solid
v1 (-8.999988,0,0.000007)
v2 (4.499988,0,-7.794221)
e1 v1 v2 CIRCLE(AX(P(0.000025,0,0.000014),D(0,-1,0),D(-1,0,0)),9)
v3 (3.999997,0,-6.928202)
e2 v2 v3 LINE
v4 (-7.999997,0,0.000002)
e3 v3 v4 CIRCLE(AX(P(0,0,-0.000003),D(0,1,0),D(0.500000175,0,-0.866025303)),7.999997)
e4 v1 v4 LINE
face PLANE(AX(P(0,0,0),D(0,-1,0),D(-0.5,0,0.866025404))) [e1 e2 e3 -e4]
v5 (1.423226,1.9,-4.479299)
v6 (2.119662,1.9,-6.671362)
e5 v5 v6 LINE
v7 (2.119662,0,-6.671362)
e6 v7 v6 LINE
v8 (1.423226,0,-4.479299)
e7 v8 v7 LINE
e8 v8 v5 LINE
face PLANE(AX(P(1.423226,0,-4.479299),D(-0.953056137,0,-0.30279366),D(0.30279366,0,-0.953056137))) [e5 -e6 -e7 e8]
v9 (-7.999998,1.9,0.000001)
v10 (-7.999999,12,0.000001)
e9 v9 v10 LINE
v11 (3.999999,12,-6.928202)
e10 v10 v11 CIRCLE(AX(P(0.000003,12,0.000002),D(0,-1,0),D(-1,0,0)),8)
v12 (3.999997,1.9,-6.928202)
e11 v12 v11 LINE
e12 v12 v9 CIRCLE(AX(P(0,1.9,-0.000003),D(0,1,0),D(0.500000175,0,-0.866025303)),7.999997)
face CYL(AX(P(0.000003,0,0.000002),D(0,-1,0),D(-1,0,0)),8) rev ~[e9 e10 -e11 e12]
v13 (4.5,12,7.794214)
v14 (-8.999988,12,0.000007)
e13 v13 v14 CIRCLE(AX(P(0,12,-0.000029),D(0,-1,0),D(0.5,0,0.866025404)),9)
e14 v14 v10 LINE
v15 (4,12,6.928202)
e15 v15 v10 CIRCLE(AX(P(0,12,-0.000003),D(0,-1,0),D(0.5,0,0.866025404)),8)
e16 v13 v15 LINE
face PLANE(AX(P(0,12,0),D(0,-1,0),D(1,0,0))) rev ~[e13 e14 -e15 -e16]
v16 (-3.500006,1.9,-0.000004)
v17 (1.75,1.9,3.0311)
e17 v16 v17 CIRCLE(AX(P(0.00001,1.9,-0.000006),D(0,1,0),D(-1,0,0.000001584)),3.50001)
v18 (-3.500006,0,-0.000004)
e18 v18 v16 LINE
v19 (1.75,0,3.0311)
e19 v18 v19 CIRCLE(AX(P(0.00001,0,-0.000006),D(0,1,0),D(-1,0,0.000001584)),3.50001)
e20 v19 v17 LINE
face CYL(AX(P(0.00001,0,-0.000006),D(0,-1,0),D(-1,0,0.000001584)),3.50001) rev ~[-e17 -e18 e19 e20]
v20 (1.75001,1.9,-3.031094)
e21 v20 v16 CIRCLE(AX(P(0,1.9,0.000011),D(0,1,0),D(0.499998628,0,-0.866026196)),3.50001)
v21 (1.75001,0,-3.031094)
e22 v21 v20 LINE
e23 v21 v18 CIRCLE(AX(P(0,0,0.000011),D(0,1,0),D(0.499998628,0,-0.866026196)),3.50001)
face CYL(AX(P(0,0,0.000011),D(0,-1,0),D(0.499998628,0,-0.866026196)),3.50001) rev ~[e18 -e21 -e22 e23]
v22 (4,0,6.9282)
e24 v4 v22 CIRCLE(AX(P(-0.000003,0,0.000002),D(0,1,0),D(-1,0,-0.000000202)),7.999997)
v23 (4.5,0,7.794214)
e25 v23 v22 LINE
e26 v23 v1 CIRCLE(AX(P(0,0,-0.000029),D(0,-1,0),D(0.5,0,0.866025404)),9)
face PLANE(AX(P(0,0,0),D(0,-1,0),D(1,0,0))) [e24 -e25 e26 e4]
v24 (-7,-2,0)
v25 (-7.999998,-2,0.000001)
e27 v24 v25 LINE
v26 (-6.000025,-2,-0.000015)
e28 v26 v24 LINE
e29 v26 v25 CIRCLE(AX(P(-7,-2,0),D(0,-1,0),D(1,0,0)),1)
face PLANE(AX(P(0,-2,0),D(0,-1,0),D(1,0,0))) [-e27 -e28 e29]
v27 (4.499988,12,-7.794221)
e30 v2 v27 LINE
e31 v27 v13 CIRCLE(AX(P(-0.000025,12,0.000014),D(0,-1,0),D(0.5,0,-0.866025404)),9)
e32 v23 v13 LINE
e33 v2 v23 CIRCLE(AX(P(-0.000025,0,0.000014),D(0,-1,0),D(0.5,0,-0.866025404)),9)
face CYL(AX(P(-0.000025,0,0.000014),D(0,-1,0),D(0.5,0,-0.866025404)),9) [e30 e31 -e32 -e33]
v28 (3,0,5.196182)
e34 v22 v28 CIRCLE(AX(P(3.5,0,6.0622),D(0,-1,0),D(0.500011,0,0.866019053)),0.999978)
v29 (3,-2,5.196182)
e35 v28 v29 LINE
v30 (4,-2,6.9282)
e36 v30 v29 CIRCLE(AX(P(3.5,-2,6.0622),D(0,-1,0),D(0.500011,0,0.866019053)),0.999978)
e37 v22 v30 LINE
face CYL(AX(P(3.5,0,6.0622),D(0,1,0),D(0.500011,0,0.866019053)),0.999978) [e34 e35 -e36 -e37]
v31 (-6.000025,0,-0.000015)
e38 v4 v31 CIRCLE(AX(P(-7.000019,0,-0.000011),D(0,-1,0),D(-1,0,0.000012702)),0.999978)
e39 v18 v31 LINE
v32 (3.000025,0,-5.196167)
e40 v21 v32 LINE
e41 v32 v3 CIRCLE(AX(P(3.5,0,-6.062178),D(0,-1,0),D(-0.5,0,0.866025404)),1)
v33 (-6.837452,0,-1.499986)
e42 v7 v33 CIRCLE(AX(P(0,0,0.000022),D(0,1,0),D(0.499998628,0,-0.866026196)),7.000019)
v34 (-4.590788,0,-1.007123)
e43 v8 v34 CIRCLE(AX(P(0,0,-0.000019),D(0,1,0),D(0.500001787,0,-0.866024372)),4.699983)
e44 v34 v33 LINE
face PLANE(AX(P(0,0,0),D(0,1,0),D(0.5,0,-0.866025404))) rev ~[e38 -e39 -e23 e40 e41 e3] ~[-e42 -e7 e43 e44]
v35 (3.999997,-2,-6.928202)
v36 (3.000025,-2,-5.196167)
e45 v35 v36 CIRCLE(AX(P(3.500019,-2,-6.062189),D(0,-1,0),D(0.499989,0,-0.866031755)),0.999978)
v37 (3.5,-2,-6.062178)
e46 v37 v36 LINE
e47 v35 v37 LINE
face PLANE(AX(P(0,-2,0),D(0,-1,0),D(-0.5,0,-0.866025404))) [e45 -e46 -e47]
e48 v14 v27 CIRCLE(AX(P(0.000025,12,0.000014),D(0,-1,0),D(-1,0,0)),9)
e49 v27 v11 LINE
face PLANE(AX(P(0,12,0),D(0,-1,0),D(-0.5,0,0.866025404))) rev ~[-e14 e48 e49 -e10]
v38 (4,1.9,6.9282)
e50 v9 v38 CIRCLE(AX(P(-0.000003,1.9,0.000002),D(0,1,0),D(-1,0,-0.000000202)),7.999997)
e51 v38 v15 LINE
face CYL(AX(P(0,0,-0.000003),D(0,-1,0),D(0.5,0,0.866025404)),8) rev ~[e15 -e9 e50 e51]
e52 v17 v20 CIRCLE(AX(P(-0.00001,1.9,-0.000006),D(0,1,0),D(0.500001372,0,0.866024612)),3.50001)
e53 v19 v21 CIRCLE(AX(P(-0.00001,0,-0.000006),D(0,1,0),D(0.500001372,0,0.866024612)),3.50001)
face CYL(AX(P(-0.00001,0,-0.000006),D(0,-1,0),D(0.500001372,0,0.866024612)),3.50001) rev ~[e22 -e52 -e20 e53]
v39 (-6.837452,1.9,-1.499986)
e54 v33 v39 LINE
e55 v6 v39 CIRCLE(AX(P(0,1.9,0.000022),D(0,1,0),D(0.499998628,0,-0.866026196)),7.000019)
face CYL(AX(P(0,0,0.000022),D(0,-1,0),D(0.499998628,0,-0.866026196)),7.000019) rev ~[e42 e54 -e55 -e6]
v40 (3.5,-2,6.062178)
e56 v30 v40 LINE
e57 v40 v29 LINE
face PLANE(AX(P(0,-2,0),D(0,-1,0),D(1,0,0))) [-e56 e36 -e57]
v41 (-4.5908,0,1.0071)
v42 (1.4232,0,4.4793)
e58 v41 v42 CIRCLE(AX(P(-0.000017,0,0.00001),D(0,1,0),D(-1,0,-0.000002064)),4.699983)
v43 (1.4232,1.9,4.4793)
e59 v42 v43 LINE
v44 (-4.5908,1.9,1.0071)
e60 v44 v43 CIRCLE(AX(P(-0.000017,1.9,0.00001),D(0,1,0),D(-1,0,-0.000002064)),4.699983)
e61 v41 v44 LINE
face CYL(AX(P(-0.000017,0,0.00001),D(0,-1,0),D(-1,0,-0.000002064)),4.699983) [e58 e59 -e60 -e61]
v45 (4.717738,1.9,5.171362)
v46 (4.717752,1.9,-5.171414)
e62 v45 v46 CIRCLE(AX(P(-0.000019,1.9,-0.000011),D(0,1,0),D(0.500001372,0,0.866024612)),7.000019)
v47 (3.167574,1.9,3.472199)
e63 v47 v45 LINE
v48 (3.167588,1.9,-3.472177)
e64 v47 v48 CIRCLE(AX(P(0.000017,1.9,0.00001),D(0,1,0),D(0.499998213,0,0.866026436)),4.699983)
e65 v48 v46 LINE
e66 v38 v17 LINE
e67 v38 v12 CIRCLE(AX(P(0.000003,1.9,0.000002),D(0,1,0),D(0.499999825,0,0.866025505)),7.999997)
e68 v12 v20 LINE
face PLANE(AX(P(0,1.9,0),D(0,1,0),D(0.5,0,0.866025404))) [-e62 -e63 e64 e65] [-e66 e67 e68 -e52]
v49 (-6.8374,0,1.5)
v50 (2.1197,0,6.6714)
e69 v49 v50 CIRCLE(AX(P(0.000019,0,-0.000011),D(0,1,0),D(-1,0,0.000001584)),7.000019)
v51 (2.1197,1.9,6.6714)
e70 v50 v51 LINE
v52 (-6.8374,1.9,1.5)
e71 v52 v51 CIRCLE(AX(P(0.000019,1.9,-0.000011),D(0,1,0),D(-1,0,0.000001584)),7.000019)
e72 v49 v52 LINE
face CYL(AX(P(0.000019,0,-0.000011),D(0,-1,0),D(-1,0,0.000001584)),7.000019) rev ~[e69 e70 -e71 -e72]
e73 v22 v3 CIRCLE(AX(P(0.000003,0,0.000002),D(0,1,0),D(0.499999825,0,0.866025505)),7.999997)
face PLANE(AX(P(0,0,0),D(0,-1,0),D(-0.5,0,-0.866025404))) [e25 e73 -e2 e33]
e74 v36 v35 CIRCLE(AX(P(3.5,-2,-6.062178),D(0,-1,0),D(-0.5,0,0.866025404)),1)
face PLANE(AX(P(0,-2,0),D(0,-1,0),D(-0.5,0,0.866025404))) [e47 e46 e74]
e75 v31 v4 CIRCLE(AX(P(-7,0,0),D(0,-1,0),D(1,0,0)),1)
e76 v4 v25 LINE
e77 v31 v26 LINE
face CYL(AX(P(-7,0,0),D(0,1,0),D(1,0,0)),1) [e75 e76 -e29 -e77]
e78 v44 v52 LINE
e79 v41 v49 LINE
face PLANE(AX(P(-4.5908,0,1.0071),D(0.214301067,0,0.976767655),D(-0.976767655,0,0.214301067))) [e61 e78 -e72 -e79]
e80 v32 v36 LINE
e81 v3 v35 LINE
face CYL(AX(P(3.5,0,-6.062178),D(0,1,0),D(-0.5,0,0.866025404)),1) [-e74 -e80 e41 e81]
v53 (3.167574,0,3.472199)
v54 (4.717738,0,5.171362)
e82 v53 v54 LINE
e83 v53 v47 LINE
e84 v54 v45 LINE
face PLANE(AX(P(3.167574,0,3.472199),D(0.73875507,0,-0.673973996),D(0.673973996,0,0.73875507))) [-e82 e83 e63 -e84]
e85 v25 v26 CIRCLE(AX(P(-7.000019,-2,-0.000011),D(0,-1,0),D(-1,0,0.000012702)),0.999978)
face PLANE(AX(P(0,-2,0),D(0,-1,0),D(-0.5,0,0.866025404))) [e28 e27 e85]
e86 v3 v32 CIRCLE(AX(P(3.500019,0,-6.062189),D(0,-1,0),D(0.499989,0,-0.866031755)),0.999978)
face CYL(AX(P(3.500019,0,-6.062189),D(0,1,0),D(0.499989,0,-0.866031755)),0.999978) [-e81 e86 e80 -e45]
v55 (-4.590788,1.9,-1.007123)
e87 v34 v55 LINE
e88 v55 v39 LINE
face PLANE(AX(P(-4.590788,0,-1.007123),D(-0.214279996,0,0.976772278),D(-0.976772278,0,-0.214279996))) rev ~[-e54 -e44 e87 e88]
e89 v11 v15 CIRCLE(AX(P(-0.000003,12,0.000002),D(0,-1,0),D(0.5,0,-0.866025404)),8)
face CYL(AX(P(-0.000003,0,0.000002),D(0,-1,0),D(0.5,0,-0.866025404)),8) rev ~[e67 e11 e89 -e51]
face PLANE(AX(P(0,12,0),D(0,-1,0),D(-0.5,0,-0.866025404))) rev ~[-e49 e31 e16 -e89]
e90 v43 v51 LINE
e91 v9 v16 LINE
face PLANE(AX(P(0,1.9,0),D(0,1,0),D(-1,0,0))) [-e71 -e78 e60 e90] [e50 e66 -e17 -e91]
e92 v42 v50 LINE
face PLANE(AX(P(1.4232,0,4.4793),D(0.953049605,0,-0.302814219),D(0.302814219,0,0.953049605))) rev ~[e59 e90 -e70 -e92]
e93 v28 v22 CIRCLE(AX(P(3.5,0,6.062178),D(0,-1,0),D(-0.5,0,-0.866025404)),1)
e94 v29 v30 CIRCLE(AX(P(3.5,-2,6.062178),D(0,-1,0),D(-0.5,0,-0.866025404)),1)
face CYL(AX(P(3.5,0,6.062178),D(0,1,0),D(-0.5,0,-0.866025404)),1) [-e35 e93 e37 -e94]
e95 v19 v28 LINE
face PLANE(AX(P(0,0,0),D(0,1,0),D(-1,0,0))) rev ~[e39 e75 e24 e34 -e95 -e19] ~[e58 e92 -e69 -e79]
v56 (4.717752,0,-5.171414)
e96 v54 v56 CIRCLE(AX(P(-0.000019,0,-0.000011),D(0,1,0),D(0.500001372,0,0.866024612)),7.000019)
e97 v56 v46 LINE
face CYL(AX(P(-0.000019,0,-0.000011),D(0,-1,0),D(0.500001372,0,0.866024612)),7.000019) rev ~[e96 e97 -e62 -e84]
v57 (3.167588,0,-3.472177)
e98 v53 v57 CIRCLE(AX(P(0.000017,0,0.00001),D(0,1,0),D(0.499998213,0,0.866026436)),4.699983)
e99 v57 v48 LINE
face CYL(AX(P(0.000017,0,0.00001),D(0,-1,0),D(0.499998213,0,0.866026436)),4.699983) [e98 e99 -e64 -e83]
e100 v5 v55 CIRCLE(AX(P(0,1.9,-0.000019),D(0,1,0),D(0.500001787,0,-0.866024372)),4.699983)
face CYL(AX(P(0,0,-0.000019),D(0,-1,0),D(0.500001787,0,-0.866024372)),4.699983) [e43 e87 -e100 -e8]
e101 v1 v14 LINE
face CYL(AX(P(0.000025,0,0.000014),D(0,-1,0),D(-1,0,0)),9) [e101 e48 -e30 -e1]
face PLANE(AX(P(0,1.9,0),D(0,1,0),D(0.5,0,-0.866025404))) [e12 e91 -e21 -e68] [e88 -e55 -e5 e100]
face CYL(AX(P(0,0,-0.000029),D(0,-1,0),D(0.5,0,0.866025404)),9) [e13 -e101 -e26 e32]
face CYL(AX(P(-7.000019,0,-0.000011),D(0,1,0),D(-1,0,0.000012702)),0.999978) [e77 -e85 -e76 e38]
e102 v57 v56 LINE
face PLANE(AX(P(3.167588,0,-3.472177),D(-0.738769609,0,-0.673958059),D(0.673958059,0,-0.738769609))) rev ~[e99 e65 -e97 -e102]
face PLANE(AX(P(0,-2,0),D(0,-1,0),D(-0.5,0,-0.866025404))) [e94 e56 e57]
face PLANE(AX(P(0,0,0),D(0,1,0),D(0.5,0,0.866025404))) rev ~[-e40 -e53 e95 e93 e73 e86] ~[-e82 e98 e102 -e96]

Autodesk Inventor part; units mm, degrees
ref_plane "YZ Plane" through (0, 0, 0) normal (1, 0, 0) x (0, 1, 0)
ref_plane "XZ Plane" through (0, 0, 0) normal (0, 1, 0) x (-1, 0, 0)
ref_plane "XY Plane" through (0, 0, 0) normal (0, 0, 1) x (1, 0, 0)
sketch "スケッチ6" plane through (0, 0, 0) normal (0, 1, 0) x (-1, 0, 0)
  arc A0 (9, 0) -> (-4.5, 7.7942) centre (0, 0) ccw
  line L0 (0, 0) -> (-4.5, 7.7942) construction
  line L1 (0, 0) -> (9, 0) construction
  arc A1 (8, 0) -> (-4, 6.9282) centre (0, 0) ccw
  line L2 (0, 0) -> (-4, 6.9282) construction
  line L3 (0, 0) -> (8, 0) construction
  arc A2 (7, 0) -> (-3.5, 6.0622) centre (0, 0) ccw
  line L4 (0, 0) -> (-3.5, 6.0622) construction
  line L5 (0, 0) -> (7, 0) construction
  arc A3 (4.7, 0) -> (-2.35, 4.0703) centre (0, 0) ccw
  arc A4 (3.5, 0) -> (-1.75, 3.0311) centre (0, 0) ccw
  line L6 (4.5908, 1.0071) -> (6.8374, 1.5)
  arc A5 (10.9533, 0) -> (5.4767, 9.4859) centre (0, 0) ccw
  line L7 (0, 0) -> (5.4767, 9.4859) construction
  line L8 (0, 0) -> (10.9533, 0) construction
  line L9 (-1.4232, 4.4793) -> (-2.1197, 6.6714)
  line L10 (0, 0) -> (9, 0)
  line L11 (0, 0) -> (-4.5, 7.7942)
  point P0 (-4, 6.9282)
  point P1 (-1.75, 3.0311)
  dimension "d33" = 9
  dimension "d34" = 120
  dimension "d35" = 120
  dimension "d36" = 1
  dimension "d37" = 120
  dimension "d38" = 2
  dimension "d39" = 4.7
  dimension "d40" = 3.5
  dimension "d41" = 1.5
  dimension "d42" = 60
extrude "押し出し6" add sketch "スケッチ6" along normal blind 1.9 contours L10 A2 L11 A1 | L10 A3 L6 A2 | A2 L9 A3 L11 | L10 A4 L11 A3
sketch "スケッチ7" plane through (0, 0, 0) normal (0, -1, 0) x (1, 0, 0)
  arc A0 (4, 6.9282) -> (-8, 0) centre (0, 0) ccw projected
  arc A1 (4.5, 7.7942) -> (-9, 0) centre (0, 0) ccw
  arc A2 (4, 6.9282) -> (-8, 0) centre (0, 0) ccw
  line L0 (0, 0) -> (4, 6.9282) construction
  line L1 (0, 0) -> (-8, 0) construction
  line L2 (4.5, 7.7942) -> (4, 6.9282)
  line L3 (-9, 0) -> (-8, 0)
  dimension "d45" = 120
  dimension "d46" = 9
  dimension "d47" = 8
  dimension "d48" = 120
extrude "押し出し7" add sketch "スケッチ7" against normal blind 12
sketch "スケッチ8" plane through (0, 0, 0) normal (0, -1, 0) x (1, 0, 0)
  arc A0 (1.75, 3.0311) -> (-3.5, 0) centre (0, 0) ccw construction
  line L0 (-3.5, 0) -> (-8, 0) projected
  arc A1 (3.5, 6.0622) -> (-7, 0) centre (0, 0) ccw construction
  line L1 (0, 0) -> (-7, 0) construction
  arc A2 (-6, 0) -> (-8, 0) centre (-7, 0) ccw
  arc A3 (4, 6.9282) -> (3, 5.1962) centre (3.5, 6.0622) ccw
  line L2 (3.5, 6.0622) -> (3, 5.1962) construction
  line L3 (-7, 0) -> (-6, 0)
  line L4 (4, 6.9282) -> (1.75, 3.0311) projected
  line L5 (4, 6.9282) -> (3, 5.1962)
  dimension "d51" = 7
  dimension "d54" = 1
  dimension "d55" = 1
extrude "押し出し8" add sketch "スケッチ8" along normal blind 2
pattern_circular "円形状パターン1" count 3 over 360 about axis through (0, 0, 0) along (0, 1, 0)
properties part number "wheel"
